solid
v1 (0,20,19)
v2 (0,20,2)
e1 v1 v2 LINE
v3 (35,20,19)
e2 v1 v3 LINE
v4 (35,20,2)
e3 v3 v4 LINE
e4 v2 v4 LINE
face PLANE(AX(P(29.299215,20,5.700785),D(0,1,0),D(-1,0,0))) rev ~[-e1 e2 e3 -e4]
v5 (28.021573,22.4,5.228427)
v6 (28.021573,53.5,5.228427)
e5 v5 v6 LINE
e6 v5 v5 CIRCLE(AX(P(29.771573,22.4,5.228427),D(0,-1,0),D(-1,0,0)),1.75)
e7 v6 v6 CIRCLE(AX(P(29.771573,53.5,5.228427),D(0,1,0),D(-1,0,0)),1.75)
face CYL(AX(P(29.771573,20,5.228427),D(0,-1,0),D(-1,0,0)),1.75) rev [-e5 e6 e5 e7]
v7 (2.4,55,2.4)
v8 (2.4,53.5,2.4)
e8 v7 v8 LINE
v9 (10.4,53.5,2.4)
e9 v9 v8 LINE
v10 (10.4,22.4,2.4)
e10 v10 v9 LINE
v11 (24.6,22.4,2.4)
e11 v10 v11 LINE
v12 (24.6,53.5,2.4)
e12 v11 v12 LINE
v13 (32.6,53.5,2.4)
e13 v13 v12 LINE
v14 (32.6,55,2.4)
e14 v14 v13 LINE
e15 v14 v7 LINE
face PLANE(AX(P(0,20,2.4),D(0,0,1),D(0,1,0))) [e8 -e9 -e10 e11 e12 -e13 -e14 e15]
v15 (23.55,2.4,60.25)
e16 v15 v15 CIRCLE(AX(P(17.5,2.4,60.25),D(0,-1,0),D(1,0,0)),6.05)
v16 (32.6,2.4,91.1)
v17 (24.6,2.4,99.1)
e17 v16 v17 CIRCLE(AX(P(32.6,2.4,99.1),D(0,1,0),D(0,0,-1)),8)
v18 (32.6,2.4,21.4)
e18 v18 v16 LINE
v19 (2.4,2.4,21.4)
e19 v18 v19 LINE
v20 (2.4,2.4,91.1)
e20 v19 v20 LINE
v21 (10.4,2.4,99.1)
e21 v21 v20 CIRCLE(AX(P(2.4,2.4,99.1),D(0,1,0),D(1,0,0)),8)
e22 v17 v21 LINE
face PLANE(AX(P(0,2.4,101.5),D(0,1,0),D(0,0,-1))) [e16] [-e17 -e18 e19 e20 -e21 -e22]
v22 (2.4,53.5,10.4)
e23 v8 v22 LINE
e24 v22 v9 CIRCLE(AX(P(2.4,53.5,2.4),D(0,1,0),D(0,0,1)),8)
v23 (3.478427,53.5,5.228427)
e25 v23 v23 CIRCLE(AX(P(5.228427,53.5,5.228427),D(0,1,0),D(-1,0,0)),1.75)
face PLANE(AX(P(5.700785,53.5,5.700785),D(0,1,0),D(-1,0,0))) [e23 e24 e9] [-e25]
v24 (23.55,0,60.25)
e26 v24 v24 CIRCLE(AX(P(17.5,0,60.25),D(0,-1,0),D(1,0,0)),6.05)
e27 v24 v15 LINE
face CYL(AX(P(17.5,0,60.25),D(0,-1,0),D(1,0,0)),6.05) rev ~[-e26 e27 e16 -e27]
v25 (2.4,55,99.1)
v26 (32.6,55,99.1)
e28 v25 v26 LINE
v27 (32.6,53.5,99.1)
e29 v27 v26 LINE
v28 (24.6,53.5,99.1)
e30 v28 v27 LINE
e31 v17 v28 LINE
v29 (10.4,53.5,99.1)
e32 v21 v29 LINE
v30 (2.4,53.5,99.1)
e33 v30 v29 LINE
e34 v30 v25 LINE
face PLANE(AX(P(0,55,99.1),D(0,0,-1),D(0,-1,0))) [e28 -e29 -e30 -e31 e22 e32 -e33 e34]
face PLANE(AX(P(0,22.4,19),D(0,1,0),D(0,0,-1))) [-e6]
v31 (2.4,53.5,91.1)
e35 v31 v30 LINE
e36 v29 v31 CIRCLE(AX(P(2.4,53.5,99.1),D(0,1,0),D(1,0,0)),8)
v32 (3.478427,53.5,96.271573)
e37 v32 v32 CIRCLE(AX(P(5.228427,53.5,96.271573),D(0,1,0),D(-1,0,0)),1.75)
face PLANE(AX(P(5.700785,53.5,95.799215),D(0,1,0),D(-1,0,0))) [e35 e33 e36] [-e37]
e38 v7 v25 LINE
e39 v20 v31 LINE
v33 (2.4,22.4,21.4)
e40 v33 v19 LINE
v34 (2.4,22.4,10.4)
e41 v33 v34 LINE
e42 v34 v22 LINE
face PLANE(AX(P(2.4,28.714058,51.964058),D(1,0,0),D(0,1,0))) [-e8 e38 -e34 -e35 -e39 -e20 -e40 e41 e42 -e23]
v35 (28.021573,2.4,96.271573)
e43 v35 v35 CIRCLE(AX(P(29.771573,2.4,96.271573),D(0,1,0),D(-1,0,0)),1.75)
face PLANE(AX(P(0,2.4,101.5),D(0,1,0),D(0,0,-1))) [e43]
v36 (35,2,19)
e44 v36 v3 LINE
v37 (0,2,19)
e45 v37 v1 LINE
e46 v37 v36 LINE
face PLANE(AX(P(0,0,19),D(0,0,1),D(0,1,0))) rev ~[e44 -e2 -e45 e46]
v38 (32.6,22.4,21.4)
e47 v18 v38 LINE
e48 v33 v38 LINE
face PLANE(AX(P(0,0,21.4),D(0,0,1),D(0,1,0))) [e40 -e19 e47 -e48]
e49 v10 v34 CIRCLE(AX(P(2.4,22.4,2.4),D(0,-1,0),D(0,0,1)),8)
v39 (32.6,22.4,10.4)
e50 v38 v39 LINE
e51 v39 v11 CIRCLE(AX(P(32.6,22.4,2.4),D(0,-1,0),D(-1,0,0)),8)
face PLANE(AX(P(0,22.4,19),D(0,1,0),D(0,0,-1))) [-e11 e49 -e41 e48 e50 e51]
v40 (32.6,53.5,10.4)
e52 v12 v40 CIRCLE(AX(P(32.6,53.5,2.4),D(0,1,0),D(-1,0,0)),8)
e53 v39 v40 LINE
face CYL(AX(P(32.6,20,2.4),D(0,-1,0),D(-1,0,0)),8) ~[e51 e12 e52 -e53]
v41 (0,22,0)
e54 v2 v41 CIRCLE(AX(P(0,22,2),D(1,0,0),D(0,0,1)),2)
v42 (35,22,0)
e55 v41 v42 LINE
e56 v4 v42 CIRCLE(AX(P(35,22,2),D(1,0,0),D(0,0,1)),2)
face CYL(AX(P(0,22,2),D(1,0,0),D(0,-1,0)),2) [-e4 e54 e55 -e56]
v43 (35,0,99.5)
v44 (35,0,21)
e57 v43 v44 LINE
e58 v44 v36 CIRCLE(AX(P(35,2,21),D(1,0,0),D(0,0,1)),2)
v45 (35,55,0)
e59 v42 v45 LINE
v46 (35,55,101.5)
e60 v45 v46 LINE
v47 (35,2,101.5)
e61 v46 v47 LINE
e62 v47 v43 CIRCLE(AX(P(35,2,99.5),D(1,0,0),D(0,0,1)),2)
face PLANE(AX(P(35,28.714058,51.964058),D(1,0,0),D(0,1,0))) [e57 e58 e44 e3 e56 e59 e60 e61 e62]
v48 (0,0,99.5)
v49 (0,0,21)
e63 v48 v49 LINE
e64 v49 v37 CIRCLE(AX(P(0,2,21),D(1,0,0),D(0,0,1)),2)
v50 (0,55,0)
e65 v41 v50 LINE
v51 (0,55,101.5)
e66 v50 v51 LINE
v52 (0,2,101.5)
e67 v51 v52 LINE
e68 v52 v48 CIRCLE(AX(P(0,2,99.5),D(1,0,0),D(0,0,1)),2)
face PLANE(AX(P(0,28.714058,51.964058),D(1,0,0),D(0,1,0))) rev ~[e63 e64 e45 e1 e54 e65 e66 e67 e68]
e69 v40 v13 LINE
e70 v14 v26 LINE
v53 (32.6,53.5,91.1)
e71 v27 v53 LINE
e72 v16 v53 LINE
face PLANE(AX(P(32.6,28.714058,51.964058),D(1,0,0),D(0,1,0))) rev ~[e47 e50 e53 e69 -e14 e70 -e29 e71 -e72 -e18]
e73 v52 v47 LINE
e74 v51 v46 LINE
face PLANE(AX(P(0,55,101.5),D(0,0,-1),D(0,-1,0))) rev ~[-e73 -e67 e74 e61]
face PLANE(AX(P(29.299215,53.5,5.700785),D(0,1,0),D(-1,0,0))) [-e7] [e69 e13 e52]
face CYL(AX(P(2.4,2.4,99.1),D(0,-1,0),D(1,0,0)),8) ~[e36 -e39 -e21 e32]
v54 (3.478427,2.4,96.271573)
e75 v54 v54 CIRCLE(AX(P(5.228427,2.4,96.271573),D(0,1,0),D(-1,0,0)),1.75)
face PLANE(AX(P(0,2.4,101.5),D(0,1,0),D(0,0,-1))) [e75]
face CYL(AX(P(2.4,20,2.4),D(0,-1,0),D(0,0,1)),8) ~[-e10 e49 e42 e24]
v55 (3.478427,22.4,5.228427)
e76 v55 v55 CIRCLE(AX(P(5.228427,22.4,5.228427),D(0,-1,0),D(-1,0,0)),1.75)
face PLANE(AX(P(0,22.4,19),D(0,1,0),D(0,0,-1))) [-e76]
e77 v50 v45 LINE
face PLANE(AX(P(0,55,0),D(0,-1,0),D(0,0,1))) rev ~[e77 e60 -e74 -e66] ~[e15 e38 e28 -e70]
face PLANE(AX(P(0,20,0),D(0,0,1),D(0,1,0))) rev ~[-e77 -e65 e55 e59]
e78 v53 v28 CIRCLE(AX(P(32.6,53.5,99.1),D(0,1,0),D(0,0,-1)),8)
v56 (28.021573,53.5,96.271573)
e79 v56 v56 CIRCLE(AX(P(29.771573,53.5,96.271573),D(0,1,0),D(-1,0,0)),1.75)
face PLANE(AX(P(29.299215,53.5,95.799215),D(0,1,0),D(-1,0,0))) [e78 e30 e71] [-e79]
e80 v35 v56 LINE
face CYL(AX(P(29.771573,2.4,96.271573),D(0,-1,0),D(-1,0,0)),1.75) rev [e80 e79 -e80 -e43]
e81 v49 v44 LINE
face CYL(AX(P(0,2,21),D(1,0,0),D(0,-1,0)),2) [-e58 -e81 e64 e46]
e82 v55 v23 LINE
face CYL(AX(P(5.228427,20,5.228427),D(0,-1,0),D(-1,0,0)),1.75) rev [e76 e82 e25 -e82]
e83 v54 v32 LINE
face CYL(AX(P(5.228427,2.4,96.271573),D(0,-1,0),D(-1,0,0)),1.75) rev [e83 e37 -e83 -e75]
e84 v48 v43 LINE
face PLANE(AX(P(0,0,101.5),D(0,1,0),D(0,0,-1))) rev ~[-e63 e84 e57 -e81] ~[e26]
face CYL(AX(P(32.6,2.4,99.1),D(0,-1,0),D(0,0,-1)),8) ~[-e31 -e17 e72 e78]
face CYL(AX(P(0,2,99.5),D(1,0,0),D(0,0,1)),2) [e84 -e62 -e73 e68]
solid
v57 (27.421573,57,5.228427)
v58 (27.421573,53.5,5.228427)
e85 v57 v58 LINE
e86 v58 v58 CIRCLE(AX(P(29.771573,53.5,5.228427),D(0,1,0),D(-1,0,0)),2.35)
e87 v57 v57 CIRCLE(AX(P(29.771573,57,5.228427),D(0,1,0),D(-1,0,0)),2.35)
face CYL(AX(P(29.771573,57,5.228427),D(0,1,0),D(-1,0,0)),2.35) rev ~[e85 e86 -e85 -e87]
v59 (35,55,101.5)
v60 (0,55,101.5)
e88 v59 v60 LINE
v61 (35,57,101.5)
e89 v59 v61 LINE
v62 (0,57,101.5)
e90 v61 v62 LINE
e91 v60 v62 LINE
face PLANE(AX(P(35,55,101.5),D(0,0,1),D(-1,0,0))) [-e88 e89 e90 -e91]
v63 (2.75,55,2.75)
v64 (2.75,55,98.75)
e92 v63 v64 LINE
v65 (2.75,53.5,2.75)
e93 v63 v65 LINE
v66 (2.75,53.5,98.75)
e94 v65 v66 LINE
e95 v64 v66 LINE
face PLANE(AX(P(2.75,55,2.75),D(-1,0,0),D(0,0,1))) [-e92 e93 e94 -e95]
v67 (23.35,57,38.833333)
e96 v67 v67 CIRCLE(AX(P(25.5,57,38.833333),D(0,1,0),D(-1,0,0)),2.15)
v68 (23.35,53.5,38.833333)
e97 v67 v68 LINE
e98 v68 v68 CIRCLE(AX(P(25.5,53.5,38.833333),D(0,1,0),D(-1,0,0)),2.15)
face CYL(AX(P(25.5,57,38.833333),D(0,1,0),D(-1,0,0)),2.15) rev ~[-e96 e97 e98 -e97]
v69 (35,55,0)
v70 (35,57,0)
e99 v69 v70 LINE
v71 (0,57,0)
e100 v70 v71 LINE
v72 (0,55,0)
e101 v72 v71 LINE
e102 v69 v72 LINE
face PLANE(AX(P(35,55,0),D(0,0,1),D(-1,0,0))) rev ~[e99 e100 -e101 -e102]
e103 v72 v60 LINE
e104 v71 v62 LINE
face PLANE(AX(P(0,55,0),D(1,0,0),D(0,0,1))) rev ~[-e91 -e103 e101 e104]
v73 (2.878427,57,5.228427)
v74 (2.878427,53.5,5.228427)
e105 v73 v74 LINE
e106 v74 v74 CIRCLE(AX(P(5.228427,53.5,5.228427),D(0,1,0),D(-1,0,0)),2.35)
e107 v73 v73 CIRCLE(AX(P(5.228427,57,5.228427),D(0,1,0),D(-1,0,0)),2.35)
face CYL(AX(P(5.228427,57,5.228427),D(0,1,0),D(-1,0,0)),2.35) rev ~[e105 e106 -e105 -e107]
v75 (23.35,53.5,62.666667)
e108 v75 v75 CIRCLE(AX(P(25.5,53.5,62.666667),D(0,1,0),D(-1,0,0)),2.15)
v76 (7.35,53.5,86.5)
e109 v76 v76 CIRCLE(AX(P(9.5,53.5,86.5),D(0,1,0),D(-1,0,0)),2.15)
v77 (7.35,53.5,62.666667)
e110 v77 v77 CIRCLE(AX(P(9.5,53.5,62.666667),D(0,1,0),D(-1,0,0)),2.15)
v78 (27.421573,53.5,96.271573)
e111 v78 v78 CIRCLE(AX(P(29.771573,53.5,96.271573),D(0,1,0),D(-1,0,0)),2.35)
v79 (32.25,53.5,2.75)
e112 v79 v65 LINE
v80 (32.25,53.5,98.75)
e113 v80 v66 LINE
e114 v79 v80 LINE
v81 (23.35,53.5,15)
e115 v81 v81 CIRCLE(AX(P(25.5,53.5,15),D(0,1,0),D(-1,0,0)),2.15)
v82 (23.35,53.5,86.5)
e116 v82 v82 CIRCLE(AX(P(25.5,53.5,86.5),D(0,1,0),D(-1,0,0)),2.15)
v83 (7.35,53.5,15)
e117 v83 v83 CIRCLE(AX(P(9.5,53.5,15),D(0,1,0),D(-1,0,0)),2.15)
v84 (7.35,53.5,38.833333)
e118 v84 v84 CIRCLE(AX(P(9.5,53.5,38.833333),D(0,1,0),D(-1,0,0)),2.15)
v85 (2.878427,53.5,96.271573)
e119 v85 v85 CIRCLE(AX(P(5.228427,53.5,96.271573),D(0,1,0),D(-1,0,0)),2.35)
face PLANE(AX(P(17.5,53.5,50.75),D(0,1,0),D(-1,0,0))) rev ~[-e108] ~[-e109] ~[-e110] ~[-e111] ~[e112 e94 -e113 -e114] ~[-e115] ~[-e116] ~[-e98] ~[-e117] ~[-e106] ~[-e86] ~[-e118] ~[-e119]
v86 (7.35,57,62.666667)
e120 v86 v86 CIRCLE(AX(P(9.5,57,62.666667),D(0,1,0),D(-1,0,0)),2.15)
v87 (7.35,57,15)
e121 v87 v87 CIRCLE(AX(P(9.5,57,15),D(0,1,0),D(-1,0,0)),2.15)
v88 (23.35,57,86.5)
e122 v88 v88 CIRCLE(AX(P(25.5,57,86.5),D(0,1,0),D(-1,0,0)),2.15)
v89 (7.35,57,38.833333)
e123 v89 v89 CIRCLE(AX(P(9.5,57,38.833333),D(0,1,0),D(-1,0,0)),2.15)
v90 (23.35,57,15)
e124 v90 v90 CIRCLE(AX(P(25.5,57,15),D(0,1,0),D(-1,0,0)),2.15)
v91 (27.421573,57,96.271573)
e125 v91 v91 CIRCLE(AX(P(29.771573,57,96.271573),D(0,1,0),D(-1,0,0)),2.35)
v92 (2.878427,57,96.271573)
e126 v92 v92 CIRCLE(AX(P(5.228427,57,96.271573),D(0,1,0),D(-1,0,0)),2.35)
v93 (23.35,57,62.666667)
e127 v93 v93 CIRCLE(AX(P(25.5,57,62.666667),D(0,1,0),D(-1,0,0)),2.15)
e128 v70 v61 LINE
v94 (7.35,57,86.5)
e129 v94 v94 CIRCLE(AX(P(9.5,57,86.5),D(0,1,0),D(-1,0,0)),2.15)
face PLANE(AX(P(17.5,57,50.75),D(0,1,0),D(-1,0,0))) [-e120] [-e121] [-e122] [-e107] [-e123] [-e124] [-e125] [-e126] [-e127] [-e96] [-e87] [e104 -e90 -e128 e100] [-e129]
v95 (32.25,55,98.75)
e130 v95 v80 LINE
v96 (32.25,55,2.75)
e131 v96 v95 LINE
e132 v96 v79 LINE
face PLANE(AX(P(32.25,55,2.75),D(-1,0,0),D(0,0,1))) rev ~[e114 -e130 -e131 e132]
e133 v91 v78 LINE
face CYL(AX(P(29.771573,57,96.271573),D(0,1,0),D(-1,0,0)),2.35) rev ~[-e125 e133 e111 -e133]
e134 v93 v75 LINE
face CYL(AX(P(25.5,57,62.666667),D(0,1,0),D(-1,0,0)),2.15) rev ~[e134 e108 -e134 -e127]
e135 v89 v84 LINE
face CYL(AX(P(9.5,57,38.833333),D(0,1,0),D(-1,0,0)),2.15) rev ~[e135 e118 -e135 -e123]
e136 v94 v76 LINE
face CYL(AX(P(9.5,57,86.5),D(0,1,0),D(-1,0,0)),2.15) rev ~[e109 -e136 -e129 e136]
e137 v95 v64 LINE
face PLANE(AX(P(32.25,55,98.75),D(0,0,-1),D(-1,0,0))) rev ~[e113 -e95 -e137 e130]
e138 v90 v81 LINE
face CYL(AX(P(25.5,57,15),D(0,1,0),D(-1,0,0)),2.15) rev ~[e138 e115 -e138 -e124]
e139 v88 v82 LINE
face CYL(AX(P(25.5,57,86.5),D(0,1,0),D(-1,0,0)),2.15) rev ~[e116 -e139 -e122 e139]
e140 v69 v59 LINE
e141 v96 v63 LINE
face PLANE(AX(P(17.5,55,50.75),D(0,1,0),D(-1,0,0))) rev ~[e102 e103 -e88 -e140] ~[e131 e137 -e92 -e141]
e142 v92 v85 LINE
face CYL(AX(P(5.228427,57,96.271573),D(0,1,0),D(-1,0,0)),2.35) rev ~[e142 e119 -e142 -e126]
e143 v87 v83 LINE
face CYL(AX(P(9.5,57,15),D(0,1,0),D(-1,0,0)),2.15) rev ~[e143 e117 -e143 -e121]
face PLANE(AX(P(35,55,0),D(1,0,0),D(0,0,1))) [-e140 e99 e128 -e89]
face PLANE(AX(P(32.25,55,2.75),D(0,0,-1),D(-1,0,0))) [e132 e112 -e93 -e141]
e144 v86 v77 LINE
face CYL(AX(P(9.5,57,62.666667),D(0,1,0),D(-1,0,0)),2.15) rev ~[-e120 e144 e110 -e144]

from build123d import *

# Parameters (mm, degrees)
F1_DEPTH  = 35
F2_R      = 2
F3_T      = -2.4
F4_R      = 6.05
F5_DEPTH  = 55.001
F6_W      = 29.5
F6_H      = 96
F7_DEPTH  = 1.5
F6_W_2    = 35
F6_H_2    = 101.5
F6_W_3    = 30.2
F6_H_3    = 96.7
F8_DEPTH  = 2
F9_R      = 1.75
F10_DEPTH = 51.1
F11_START = 17.6
F11_DEPTH = 33.5
F12_R     = 2.35
F13_DEPTH = 57.001
F14_R     = 2.15
F15_DEPTH = 57.001


with BuildPart() as f1:
    # F0 (on Right) → F1 (new body)
    with BuildSketch(Plane.YZ):
        Polygon((20, 19), (20, 0), (55, 0), (55, 101.5), (0, 101.5), (0, 19), align=None)
    extrude(amount=F1_DEPTH)

    # F2
    f2_edges = [f1.edges().sort_by_distance(p)[0] for p in [
        (17.5, 0, 101.5),
        (17.5, 0, 19),
        (17.5, 20, 0),
    ]]
    fillet(f2_edges, radius=F2_R)

    # F3
    f3_openings = [f1.faces().sort_by_distance(p)[0] for p in [
        (17.5, 55, 50.75),
    ]]
    offset(amount=F3_T, openings=f3_openings, kind=Kind.INTERSECTION)

    # F4 (on face) → F5 (cut, through all)
    with BuildSketch(Plane.XZ):
        with Locations((17.5, 60.25)):
            Circle(F4_R)
    extrude(amount=-F5_DEPTH, mode=Mode.SUBTRACT)

    # F9 (on face) → F10 (join, through all)
    with BuildSketch(Plane(origin=(0, 2.4, 0), x_dir=(-1, 0, 0), z_dir=(0, 1, 0))):
        with BuildLine():
            Line((-2.4, 99.1), (-10.4, 99.1))
            ThreePointArc((-10.4, 99.1), (-8.0568542495, 93.4431457505), (-2.4, 91.1))
            Line((-2.4, 91.1), (-2.4, 99.1))
        make_face()
        with Locations((-5.2284271247, 96.2715728753)):
            Circle(F9_R, mode=Mode.SUBTRACT)
        with BuildLine():
            Line((-24.6, 99.1), (-32.6, 99.1))
            Line((-32.6, 99.1), (-32.6, 91.1))
            ThreePointArc((-32.6, 91.1), (-26.9431457505, 93.4431457505), (-24.6, 99.1))
        make_face()
        with Locations((-29.7715728753, 96.2715728753)):
            Circle(F9_R, mode=Mode.SUBTRACT)
    extrude(amount=F10_DEPTH)

    # F9 (on face) → F11 (join)
    with BuildSketch(Plane(origin=(0, 2.4, 0), x_dir=(-1, 0, 0), z_dir=(0, 1, 0)).offset(F11_START)):
        with BuildLine():
            ThreePointArc((-24.6, 2.4), (-26.9431457505, 8.0568542495), (-32.6, 10.4))
            Line((-32.6, 10.4), (-32.6, 2.4))
            Line((-32.6, 2.4), (-24.6, 2.4))
        make_face()
        with Locations((-29.7715728753, 5.2284271247)):
            Circle(F9_R, mode=Mode.SUBTRACT)
        with BuildLine():
            Line((-2.4, 2.4), (-2.4, 10.4))
            ThreePointArc((-2.4, 10.4), (-8.0568542495, 8.0568542495), (-10.4, 2.4))
            Line((-10.4, 2.4), (-2.4, 2.4))
        make_face()
        with Locations((-5.2284271247, 5.2284271247)):
            Circle(F9_R, mode=Mode.SUBTRACT)
    extrude(amount=F11_DEPTH)


with BuildPart() as f7:
    # F6 (on face) → F7 (new body)
    with BuildSketch(Plane(origin=(0, 55, 0), x_dir=(-1, 0, 0), z_dir=(0, 1, 0))):
        with Locations((-17.5, 50.75)):
            Rectangle(F6_W, F6_H)
    extrude(amount=-F7_DEPTH)

    # F6 (on face) → F8 (join)
    with BuildSketch(Plane(origin=(0, 55, 0), x_dir=(-1, 0, 0), z_dir=(0, 1, 0))):
        with Locations((-17.5, 50.75)):
            Rectangle(F6_W_2, F6_H_2)
        with Locations((-17.5, 50.75)):
            Rectangle(F6_W_3, F6_H_3, mode=Mode.SUBTRACT)
        with Locations((-17.5, 50.75)):
            Rectangle(F6_W_3, F6_H_3)
        with Locations((-17.5, 50.75)):
            Rectangle(F6_W, F6_H, mode=Mode.SUBTRACT)
        with Locations((-17.5, 50.75)):
            Rectangle(F6_W, F6_H)
    extrude(amount=F8_DEPTH)

    # F12 (on face) → F13 (cut, through all)
    with BuildSketch(Plane(origin=(0, 57, 0), x_dir=(-1, 0, 0), z_dir=(0, 1, 0))):
        with Locations((-5.2284271247, 96.2715728753)):
            Circle(F12_R)
        with Locations((-29.7715728753, 96.2715728753)):
            Circle(F12_R)
        with Locations((-29.7715728753, 5.2284271247)):
            Circle(F12_R)
        with Locations((-5.2284271247, 5.2284271247)):
            Circle(F12_R)
    extrude(amount=-F13_DEPTH, mode=Mode.SUBTRACT)

    # F14 (on face) → F15 (cut, through all)
    with BuildSketch(Plane(origin=(0, 57, 0), x_dir=(-1, 0, 0), z_dir=(0, 1, 0))):
        with Locations((-25.5, 86.5)):
            Circle(F14_R)
        with Locations((-9.5, 86.5)):
            Circle(F14_R)
        with Locations((-25.5, 62.6666666667)):
            Circle(F14_R)
        with Locations((-9.5, 62.6666666667)):
            Circle(F14_R)
        with Locations((-25.5, 38.8333333333)):
            Circle(F14_R)
        with Locations((-9.5, 38.8333333333)):
            Circle(F14_R)
        with Locations((-25.5, 15)):
            Circle(F14_R)
        with Locations((-9.5, 15)):
            Circle(F14_R)
    extrude(amount=-F15_DEPTH, mode=Mode.SUBTRACT)


solid = Compound([f1.part, f7.part])
